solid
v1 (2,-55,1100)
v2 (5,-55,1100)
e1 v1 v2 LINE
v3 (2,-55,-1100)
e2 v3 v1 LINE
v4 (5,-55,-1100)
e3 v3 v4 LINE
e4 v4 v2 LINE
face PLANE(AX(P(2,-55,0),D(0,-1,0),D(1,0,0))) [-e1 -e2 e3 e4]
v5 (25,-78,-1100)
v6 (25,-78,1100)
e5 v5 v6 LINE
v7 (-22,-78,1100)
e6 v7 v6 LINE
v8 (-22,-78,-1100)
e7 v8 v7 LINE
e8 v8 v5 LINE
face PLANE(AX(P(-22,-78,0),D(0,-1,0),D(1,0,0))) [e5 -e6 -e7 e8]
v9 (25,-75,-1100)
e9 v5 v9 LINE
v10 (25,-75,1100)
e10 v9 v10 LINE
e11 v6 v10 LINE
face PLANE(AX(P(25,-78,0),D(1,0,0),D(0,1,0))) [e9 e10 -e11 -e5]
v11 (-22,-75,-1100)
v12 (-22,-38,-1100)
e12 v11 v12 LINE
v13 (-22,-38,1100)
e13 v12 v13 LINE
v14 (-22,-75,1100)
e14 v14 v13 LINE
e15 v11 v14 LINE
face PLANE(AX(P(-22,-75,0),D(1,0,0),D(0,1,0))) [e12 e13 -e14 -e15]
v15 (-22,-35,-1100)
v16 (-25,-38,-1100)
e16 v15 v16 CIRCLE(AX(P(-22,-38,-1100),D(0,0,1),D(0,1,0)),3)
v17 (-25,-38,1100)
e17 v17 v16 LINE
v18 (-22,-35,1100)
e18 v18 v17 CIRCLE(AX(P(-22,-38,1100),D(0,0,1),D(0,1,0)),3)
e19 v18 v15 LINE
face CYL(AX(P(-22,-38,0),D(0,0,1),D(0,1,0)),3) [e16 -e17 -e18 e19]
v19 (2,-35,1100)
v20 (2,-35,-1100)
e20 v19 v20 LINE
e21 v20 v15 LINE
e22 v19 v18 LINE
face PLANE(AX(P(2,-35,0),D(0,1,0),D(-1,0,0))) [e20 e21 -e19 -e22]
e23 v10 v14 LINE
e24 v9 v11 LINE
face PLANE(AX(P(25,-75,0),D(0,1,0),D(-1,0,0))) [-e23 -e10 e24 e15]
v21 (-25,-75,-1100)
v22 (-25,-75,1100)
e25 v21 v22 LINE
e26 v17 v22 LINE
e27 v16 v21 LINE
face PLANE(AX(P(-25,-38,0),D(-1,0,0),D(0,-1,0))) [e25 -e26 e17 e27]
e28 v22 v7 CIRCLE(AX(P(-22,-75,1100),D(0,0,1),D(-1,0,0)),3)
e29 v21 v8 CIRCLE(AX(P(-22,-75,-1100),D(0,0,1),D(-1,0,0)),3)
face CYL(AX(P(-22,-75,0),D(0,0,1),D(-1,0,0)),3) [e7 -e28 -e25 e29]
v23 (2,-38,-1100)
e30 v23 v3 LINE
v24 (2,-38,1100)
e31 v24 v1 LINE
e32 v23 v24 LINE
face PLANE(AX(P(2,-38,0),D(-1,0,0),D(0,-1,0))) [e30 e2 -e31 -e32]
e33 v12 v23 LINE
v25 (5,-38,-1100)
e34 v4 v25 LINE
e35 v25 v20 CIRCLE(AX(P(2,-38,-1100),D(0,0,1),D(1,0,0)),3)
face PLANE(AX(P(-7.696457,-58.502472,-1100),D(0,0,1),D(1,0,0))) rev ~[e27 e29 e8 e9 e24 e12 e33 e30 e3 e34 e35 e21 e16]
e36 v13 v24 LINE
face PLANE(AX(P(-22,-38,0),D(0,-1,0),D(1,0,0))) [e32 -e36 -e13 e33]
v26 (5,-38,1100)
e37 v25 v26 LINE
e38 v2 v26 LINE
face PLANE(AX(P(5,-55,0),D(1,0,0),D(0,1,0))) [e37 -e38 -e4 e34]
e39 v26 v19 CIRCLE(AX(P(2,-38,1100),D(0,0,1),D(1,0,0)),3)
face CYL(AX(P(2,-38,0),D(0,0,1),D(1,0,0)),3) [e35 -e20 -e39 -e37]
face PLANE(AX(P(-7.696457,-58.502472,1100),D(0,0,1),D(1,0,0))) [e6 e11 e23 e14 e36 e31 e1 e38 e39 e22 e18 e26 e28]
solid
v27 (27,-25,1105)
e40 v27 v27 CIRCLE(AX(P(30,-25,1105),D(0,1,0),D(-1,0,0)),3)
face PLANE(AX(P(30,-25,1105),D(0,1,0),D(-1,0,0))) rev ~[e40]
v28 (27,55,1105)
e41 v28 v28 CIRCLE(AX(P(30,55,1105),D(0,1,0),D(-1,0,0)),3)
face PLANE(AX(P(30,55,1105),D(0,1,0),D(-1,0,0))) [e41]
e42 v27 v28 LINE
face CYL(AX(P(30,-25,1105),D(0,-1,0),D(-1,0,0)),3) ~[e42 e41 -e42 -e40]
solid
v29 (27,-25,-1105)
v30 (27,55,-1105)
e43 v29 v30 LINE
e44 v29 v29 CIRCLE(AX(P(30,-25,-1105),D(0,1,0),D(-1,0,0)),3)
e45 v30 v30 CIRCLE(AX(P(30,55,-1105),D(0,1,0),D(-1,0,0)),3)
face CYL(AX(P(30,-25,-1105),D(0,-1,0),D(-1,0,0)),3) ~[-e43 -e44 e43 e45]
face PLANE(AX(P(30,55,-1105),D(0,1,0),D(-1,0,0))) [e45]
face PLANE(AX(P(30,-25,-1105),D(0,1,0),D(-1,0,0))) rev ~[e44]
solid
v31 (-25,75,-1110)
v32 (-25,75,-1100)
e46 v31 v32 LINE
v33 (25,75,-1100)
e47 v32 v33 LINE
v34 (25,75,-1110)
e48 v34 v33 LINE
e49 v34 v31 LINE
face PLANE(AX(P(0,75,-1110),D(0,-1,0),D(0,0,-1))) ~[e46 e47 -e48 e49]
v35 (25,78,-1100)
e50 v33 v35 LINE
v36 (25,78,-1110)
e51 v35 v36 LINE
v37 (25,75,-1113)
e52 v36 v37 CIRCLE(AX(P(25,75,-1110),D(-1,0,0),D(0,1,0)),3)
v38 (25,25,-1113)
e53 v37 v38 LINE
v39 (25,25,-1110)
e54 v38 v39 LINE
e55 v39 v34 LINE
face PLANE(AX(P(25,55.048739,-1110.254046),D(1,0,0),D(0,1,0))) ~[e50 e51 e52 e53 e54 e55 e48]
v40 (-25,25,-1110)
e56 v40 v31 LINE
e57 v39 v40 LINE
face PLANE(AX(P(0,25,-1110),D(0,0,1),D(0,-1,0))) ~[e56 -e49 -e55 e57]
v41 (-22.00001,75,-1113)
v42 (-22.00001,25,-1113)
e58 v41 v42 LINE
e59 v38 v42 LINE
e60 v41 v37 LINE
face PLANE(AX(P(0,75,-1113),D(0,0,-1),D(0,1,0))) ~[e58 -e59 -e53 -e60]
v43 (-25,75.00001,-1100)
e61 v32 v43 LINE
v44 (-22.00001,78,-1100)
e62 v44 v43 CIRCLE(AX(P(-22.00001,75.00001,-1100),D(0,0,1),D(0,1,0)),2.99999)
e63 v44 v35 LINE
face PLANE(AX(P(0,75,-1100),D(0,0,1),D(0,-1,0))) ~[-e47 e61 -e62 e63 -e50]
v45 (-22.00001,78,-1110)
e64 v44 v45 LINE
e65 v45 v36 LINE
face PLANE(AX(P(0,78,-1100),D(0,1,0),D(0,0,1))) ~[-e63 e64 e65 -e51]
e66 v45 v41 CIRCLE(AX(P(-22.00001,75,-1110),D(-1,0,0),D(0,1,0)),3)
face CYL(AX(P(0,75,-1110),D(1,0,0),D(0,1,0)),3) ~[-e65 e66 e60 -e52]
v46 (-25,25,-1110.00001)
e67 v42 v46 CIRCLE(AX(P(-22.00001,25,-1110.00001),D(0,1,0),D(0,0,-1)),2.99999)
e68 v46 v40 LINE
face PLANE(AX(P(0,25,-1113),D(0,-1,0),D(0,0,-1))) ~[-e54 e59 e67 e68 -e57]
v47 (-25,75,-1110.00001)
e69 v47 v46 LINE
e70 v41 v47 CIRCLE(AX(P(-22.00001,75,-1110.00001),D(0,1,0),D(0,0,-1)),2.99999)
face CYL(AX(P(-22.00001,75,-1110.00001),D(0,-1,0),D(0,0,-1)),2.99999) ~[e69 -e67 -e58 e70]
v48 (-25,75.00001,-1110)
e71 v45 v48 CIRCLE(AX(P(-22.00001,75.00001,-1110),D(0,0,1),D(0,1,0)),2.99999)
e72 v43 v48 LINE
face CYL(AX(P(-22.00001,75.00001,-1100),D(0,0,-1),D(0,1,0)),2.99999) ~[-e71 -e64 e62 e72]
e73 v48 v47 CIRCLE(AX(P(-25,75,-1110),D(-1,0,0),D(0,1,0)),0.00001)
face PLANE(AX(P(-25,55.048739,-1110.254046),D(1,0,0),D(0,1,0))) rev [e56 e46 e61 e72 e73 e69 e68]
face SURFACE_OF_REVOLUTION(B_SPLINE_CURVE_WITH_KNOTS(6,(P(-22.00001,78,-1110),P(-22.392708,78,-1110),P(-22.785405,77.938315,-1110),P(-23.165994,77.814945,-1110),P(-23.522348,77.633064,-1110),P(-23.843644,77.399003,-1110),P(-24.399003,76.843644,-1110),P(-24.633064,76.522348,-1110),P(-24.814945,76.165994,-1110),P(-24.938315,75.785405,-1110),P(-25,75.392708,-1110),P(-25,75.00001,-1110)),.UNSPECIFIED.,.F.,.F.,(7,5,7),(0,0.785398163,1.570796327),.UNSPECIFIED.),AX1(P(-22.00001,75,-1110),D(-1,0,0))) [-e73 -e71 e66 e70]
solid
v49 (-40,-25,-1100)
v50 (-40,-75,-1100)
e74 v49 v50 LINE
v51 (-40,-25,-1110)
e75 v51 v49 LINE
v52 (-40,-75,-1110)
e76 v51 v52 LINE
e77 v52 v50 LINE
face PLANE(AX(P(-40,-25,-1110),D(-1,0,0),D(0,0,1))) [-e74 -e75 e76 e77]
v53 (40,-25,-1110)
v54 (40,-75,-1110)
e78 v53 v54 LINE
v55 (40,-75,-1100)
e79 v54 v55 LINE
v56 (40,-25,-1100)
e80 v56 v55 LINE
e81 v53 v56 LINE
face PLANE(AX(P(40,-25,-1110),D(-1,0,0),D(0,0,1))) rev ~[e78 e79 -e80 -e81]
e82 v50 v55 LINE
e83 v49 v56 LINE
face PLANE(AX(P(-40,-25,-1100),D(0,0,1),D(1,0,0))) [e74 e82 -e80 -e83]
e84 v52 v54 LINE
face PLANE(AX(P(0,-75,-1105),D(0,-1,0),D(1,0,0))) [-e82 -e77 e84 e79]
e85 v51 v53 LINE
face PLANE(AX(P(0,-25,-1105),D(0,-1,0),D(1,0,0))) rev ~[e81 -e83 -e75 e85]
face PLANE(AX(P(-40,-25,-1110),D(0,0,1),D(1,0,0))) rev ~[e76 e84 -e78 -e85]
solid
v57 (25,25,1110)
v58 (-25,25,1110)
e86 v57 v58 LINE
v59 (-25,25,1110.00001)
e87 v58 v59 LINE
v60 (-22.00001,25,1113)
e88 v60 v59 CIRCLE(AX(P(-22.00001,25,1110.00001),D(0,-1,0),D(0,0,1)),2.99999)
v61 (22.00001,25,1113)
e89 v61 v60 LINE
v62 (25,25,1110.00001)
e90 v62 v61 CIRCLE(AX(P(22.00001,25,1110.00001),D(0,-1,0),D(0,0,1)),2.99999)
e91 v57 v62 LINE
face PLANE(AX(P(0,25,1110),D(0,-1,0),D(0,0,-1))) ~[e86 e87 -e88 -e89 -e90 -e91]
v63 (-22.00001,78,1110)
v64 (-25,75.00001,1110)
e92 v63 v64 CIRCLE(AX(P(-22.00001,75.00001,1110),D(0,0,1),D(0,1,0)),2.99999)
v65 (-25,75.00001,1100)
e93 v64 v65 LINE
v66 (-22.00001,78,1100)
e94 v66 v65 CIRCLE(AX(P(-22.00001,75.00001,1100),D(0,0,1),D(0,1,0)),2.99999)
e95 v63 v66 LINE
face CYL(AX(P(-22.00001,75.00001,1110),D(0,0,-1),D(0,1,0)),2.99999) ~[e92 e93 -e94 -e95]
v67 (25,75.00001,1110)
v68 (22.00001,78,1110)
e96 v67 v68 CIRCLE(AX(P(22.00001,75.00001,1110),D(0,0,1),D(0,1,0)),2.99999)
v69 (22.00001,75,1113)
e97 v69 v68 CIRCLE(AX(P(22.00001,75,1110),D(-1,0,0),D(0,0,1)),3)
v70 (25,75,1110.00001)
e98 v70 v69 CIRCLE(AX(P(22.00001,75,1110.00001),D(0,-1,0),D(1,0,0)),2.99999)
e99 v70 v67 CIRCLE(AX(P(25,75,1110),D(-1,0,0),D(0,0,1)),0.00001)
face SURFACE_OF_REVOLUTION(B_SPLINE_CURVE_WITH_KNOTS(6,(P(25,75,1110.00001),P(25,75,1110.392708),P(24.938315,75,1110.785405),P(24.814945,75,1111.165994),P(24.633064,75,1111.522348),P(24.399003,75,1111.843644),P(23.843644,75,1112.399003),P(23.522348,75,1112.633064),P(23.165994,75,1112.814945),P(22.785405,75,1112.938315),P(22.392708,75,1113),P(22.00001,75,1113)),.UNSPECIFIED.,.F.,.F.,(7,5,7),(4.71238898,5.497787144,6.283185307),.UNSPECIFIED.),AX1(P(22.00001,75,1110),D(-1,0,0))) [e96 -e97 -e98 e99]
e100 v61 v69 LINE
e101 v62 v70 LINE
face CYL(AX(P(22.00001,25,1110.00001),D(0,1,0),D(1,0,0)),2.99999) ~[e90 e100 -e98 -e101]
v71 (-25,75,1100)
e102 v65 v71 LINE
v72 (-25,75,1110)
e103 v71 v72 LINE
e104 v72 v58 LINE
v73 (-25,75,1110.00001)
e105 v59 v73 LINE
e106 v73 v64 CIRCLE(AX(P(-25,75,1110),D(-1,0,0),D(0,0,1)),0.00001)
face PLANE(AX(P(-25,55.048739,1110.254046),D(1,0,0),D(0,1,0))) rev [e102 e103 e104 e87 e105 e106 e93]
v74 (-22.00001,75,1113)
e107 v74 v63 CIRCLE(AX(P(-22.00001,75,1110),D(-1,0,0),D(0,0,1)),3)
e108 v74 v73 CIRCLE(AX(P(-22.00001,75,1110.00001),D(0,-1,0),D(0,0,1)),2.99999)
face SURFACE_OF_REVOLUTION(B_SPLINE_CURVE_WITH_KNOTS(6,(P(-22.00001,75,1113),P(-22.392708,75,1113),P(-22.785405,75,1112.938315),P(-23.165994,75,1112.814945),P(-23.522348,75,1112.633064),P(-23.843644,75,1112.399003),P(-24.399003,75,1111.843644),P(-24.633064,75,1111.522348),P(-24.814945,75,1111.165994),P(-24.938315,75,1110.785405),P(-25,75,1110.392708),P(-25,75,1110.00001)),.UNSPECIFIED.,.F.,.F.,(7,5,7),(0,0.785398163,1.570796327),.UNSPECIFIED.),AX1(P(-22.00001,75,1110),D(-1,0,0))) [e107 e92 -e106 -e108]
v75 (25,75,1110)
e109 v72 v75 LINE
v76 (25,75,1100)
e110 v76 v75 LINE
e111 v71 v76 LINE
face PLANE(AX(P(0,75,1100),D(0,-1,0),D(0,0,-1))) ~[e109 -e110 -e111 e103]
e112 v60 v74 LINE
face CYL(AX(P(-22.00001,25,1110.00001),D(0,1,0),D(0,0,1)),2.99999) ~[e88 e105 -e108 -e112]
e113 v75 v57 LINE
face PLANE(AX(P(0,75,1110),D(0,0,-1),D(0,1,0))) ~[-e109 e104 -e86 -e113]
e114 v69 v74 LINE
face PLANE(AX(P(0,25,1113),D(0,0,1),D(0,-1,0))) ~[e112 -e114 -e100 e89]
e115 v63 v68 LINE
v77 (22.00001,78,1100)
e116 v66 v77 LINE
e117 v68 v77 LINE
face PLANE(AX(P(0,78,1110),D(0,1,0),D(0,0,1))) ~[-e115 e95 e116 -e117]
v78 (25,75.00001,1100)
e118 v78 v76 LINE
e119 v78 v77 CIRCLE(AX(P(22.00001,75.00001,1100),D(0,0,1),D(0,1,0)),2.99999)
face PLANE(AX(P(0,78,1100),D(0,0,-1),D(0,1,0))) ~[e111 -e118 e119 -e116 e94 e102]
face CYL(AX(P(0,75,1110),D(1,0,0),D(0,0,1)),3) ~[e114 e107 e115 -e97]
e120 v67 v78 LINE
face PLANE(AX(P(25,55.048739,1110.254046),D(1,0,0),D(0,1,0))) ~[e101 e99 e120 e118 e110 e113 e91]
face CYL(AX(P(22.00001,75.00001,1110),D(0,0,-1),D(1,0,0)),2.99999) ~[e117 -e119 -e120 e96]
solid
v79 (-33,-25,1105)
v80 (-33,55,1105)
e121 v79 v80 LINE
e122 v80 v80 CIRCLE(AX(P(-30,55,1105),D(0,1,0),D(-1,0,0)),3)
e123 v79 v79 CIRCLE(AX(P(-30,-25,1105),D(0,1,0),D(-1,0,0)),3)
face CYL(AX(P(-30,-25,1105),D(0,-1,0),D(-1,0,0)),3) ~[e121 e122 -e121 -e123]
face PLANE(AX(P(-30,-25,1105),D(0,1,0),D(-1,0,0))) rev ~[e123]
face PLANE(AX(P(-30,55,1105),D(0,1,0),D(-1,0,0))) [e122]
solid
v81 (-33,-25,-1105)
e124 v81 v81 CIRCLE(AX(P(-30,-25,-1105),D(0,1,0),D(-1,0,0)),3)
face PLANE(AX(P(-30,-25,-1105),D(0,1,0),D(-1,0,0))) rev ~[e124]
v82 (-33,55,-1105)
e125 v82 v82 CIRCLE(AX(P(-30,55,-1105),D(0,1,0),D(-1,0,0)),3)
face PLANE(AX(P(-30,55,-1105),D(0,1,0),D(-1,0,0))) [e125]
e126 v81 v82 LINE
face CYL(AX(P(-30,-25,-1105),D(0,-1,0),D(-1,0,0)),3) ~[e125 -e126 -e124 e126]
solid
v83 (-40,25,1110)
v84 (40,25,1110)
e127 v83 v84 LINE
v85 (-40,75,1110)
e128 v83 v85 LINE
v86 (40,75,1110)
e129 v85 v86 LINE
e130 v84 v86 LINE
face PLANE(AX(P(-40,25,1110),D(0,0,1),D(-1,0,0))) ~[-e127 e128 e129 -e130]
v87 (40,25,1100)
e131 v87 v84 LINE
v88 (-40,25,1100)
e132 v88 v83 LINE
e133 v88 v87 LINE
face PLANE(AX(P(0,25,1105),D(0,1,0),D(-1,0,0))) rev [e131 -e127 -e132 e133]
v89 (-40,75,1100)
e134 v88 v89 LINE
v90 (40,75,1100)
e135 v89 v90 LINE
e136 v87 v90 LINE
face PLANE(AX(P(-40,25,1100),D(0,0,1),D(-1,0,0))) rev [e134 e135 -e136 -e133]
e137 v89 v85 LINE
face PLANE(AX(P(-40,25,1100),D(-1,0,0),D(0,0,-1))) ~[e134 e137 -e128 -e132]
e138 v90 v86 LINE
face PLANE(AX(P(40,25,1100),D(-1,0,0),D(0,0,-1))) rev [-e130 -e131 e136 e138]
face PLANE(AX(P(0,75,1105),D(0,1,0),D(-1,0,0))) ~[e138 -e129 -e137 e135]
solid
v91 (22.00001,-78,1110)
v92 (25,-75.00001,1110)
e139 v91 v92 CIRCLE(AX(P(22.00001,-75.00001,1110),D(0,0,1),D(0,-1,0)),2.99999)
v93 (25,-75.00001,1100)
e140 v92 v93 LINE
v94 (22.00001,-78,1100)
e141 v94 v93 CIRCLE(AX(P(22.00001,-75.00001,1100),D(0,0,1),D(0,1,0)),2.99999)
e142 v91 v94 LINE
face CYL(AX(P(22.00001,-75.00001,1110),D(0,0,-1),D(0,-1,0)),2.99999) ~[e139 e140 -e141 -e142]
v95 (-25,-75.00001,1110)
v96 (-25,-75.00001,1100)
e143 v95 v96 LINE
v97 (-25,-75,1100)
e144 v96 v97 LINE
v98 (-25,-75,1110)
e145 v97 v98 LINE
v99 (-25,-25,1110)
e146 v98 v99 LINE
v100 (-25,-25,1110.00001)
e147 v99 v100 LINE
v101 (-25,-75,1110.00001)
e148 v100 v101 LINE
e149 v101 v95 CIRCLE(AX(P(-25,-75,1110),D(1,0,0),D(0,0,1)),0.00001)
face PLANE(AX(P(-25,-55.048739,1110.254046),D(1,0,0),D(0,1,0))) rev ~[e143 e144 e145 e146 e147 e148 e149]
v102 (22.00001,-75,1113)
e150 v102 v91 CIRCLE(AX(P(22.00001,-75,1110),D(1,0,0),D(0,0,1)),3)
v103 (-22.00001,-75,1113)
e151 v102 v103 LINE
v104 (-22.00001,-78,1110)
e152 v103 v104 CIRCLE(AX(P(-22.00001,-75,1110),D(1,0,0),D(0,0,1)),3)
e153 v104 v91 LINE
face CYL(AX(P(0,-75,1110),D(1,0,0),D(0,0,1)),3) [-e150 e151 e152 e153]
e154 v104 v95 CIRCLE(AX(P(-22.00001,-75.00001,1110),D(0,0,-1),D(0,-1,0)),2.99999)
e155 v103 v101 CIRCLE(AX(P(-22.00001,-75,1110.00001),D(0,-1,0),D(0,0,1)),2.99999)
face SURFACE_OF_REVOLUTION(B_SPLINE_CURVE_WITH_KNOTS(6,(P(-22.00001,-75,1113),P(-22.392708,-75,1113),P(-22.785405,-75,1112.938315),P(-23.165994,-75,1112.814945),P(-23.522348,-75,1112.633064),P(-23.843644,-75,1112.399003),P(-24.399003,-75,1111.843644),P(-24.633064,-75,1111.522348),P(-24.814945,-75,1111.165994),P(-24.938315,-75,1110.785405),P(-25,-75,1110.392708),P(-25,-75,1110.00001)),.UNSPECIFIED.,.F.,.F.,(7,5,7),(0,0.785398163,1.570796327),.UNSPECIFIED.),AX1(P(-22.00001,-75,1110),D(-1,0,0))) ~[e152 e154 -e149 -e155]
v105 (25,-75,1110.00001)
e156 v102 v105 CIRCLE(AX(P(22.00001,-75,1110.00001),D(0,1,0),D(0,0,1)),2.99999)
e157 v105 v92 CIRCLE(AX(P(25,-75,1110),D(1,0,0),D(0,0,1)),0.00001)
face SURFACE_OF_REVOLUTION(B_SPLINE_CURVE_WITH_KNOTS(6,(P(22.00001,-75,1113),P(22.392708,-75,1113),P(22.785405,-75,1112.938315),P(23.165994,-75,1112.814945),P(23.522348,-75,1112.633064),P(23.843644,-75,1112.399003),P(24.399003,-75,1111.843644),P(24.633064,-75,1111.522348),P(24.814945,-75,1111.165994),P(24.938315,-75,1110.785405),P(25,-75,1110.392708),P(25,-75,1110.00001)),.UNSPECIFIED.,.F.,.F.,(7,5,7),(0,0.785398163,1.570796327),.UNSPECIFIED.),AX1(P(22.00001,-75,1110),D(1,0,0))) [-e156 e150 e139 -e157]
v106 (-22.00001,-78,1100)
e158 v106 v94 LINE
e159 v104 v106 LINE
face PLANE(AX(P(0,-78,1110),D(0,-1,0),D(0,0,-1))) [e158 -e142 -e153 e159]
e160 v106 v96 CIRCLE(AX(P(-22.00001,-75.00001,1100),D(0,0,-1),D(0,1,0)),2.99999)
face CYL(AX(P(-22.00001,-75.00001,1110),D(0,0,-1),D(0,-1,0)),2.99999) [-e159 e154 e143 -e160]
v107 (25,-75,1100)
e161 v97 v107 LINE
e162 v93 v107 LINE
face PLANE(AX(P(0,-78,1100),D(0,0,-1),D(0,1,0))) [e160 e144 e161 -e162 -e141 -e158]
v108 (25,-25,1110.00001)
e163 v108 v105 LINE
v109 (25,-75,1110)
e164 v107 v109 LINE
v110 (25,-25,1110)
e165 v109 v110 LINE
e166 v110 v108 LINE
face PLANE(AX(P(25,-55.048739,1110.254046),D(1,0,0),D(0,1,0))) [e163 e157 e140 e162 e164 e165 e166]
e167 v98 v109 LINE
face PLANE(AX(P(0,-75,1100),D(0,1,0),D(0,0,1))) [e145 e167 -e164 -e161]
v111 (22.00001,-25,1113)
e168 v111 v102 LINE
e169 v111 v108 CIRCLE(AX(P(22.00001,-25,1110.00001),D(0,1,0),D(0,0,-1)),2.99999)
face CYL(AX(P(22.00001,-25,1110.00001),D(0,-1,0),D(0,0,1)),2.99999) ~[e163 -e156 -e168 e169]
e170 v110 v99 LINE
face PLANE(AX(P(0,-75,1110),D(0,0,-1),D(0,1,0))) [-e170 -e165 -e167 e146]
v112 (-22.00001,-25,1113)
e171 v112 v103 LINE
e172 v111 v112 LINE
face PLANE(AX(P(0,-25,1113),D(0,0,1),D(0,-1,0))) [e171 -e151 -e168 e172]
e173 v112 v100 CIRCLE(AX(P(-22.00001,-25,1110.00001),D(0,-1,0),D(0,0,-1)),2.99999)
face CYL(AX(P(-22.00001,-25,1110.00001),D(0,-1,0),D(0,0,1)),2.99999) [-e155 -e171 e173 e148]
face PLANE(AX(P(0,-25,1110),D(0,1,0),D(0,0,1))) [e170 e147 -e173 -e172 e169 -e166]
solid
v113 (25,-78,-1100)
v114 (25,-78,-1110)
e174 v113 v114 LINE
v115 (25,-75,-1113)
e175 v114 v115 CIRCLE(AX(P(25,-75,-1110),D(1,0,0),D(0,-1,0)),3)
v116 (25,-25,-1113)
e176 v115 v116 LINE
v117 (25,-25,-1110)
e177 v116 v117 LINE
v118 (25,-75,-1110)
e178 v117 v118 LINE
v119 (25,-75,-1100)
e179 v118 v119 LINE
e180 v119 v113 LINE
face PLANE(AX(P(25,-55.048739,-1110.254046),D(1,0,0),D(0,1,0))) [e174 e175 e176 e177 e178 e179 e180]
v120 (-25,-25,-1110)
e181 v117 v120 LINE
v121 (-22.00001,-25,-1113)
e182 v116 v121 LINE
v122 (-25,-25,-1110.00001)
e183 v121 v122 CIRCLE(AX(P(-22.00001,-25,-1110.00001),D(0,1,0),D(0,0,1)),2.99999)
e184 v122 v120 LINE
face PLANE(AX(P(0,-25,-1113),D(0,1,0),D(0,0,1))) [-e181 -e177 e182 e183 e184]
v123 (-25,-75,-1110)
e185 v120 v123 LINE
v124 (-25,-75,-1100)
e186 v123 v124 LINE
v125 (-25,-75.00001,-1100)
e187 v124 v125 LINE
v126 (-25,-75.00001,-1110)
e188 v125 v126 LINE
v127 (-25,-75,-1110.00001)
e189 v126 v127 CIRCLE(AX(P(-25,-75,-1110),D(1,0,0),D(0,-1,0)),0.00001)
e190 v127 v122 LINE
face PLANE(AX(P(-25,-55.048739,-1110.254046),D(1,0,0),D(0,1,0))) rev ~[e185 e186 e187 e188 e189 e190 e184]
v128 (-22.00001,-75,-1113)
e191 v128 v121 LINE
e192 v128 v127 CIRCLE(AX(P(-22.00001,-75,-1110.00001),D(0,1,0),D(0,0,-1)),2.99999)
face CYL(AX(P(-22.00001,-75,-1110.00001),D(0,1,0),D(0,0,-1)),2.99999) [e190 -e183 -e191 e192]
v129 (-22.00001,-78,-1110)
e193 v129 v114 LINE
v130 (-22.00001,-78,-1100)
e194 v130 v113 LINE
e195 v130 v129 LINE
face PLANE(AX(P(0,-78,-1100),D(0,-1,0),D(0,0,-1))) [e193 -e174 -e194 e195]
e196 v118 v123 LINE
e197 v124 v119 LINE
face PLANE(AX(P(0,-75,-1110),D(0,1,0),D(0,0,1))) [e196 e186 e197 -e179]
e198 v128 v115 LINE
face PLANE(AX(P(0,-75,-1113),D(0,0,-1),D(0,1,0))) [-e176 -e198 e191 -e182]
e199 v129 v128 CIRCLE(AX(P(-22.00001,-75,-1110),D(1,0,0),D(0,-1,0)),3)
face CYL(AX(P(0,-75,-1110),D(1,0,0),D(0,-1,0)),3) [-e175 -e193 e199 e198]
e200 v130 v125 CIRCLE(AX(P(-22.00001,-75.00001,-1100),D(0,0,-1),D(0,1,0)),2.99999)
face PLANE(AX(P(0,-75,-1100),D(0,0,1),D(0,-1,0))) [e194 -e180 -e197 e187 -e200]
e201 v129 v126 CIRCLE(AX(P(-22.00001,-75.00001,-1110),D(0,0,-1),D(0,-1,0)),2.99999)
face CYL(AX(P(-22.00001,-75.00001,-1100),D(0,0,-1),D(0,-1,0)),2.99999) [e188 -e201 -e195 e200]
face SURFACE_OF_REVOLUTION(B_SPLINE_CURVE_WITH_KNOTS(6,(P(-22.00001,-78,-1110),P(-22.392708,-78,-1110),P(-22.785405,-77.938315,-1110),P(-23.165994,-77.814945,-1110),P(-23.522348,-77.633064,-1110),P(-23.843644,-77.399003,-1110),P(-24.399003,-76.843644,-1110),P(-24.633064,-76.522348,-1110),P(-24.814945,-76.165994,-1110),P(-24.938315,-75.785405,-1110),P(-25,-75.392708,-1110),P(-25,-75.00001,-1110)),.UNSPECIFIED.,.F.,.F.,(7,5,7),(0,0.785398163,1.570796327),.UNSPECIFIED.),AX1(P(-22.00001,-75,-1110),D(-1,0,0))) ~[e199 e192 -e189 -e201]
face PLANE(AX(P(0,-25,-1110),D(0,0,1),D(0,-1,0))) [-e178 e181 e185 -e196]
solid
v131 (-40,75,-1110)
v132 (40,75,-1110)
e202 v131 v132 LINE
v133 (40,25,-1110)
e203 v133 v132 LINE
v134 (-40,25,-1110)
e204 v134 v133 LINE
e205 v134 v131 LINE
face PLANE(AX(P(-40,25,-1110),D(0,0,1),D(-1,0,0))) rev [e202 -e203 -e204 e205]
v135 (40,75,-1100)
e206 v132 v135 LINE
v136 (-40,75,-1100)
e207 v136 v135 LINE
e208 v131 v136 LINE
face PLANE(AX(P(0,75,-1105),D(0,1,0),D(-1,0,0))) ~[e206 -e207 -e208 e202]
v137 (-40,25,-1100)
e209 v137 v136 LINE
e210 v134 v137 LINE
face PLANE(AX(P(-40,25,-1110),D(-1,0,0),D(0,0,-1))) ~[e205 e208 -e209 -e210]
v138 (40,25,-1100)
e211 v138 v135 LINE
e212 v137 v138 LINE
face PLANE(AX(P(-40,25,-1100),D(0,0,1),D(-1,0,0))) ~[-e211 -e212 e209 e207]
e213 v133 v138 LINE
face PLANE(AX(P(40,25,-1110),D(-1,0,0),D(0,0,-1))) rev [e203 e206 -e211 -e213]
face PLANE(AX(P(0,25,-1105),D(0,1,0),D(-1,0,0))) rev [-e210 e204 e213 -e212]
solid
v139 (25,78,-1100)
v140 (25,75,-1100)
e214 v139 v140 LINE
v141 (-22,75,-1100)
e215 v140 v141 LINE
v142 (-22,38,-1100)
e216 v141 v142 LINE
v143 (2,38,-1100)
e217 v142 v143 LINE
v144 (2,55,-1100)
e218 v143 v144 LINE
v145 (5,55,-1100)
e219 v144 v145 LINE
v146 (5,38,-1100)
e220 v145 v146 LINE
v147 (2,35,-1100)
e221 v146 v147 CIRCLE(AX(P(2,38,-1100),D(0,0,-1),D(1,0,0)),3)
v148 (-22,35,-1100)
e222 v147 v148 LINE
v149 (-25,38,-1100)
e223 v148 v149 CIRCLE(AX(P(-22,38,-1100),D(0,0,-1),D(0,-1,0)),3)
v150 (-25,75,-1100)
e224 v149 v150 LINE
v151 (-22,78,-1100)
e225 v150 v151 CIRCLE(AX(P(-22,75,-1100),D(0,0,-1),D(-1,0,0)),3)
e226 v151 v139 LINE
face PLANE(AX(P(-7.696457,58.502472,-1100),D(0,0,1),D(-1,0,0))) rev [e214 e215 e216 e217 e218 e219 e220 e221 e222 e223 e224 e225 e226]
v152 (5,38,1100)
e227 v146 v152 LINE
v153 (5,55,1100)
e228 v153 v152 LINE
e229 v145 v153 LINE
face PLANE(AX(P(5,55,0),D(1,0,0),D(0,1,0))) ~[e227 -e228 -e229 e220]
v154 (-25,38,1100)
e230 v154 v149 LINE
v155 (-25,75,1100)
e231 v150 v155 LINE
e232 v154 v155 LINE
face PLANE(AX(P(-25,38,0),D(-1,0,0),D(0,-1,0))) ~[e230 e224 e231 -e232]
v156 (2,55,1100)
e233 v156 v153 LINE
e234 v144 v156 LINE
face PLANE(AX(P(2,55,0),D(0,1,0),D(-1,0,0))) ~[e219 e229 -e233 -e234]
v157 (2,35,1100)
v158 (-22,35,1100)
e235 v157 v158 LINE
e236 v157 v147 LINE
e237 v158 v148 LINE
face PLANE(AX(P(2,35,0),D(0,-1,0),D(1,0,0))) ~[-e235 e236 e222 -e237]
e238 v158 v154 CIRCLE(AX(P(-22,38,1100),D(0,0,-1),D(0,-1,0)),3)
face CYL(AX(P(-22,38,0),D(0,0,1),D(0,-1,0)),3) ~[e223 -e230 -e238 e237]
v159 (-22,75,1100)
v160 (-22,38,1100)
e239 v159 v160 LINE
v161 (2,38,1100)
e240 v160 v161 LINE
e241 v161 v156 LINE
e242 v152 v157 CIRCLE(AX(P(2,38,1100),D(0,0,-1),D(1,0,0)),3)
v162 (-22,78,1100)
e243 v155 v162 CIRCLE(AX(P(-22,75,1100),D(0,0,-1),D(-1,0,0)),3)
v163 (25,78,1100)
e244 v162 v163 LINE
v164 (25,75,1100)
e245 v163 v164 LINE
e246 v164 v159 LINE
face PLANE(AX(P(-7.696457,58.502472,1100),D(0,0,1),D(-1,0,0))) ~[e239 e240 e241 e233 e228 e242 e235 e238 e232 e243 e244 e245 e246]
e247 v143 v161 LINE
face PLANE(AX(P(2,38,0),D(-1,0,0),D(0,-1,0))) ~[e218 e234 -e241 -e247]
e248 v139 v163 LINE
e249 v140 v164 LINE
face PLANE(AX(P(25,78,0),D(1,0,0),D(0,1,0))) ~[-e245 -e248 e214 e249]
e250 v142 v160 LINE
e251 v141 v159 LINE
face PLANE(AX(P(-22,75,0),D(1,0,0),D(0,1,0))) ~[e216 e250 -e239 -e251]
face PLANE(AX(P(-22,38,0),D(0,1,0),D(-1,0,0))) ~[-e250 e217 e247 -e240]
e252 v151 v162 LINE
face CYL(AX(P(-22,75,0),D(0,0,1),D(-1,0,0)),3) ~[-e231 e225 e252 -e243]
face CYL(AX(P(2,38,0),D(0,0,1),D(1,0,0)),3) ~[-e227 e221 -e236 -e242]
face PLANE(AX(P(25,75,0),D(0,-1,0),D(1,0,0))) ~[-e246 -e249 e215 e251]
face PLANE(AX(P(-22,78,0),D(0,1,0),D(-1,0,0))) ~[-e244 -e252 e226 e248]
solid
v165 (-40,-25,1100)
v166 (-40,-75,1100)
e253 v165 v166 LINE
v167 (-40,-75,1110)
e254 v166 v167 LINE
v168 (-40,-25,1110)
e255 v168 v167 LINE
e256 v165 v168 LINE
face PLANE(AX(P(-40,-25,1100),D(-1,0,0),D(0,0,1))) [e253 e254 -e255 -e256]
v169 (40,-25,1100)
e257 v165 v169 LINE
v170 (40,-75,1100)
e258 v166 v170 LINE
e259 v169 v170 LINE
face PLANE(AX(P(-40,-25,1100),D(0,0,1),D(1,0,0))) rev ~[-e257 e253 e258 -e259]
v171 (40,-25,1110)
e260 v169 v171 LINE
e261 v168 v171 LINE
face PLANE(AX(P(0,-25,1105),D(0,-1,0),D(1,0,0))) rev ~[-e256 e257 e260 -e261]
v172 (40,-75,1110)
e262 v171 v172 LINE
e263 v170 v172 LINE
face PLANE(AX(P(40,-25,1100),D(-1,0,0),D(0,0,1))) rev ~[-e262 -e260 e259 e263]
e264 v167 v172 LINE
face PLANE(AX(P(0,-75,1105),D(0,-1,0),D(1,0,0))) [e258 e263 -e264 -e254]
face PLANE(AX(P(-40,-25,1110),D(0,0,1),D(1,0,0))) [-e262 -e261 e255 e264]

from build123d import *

# Parameters (mm, degrees)
F1_W     = 80
F1_H     = 10
F2_DEPTH = 50
F4_R     = 3
F5_DEPTH = 80
F7_DEPTH = 1100
F9_DEPTH = 25
F11_R    = 2.99999
F11_2_R  = 2.99999
F11_3_R  = 2.99999
F11_4_R  = 2.99999


# Not quite as in the source:
# - a fillet or chamfer is up to 0.001 mm smaller than in the source, because OpenCascade refuses the exact size
# - a feature names something its author has since deleted; it is built from what else it names


with BuildPart() as f2:
    # F1 (on offset) → F2 (new body)
    with BuildSketch(Plane.XZ.offset(25)):
        with Locations((0, 1105)):
            Rectangle(F1_W, F1_H)
    extrude(amount=F2_DEPTH)


with BuildPart() as f2b:
    # F1 (on offset) → F2, piece 2 (new body)
    with BuildSketch(Plane.XZ.offset(25)):
        with Locations((0, -1105)):
            Rectangle(F1_W, F1_H)
    extrude(amount=F2_DEPTH)


with BuildPart() as f5:
    # F4 (on face) → F5 (new body)
    with BuildSketch(Plane(origin=(0, -25, 0), x_dir=(-1, 0, 0), z_dir=(0, 1, 0))):
        with Locations((-30, 1105)):
            Circle(F4_R)
    extrude(amount=F5_DEPTH)


with BuildPart() as f5b:
    # F4 (on face) → F5, piece 2 (new body)
    with BuildSketch(Plane(origin=(0, -25, 0), x_dir=(-1, 0, 0), z_dir=(0, 1, 0))):
        with Locations((30, 1105)):
            Circle(F4_R)
    extrude(amount=F5_DEPTH)


with BuildPart() as f5c:
    # F4 (on face) → F5, piece 3 (new body)
    with BuildSketch(Plane(origin=(0, -25, 0), x_dir=(-1, 0, 0), z_dir=(0, 1, 0))):
        with Locations((-30, -1105)):
            Circle(F4_R)
    extrude(amount=F5_DEPTH)


with BuildPart() as f5d:
    # F4 (on face) → F5, piece 4 (new body)
    with BuildSketch(Plane(origin=(0, -25, 0), x_dir=(-1, 0, 0), z_dir=(0, 1, 0))):
        with Locations((30, -1105)):
            Circle(F4_R)
    extrude(amount=F5_DEPTH)


with BuildPart() as f7:
    # F6 (on Top) → F7 (new body, symmetric)
    with BuildSketch(Plane.XY):
        with BuildLine():
            Line((-25, -38), (-25, -75))
            ThreePointArc((-25, -75), (-24.1213203436, -77.1213203436), (-22, -78))
            Line((-22, -78), (25, -78))
            Line((25, -78), (25, -75))
            Line((25, -75), (-22, -75))
            Line((-22, -75), (-22, -38))
            Line((-22, -38), (2, -38))
            Line((2, -38), (2, -55))
            Line((2, -55), (5, -55))
            Line((5, -55), (5, -38))
            ThreePointArc((5, -38), (4.1213203436, -35.8786796564), (2, -35))
            Line((2, -35), (-22, -35))
            ThreePointArc((-22, -35), (-24.1213203436, -35.8786796564), (-25, -38))
        make_face()
    extrude(amount=F7_DEPTH, both=True)


with BuildPart() as f9:
    # F8 (on Right) → F9 (new body, symmetric)
    with BuildSketch(Plane.YZ):
        with BuildLine():
            Line((-75, -1110), (-75, -1100))
            Line((-75, -1100), (-78, -1100))
            Line((-78, -1100), (-78, -1110))
            ThreePointArc((-78, -1110), (-77.1213203436, -1112.1213203436), (-75, -1113))
            Line((-75, -1113), (-25, -1113))
            Line((-25, -1113), (-25, -1110))
            Line((-25, -1110), (-75, -1110))
        make_face()
    extrude(amount=F9_DEPTH, both=True)


with BuildPart() as f9b:
    # F8 (on Right) → F9, piece 2 (new body, symmetric)
    with BuildSketch(Plane.YZ):
        with BuildLine():
            ThreePointArc((-75, 1113), (-77.1213203436, 1112.1213203436), (-78, 1110))
            Line((-78, 1110), (-78, 1100))
            Line((-78, 1100), (-75, 1100))
            Line((-75, 1100), (-75, 1110))
            Line((-75, 1110), (-25, 1110))
            Line((-25, 1110), (-25, 1113))
            Line((-25, 1113), (-75, 1113))
        make_face()
    extrude(amount=F9_DEPTH, both=True)


with BuildPart() as f10_1:
    # F10: instance of F2
    add(f2.part.mirror(Plane.XZ))


with BuildPart() as f10_2:
    # F10: instance of F2b
    add(f2b.part.mirror(Plane.XZ))


with BuildPart() as f10_3:
    # F10: instance of F7
    add(f7.part.mirror(Plane.XZ))


with BuildPart() as f10_4:
    # F10: instance of F9b
    add(f9b.part.mirror(Plane.XZ))

    # F11#3 (radius 3 in the source; OpenCascade refuses exactly that, so slightly less here)
    f11_3_edges = [f10_4.edges().sort_by_distance(p)[0] for p in [
        (-25, 78, 1105),
        (25, 78, 1105),
        (-25, 77.12132, 1112.12132),
        (25, 77.12132, 1112.12132),
        (-25, 50, 1113),
        (25, 50, 1113),
    ]]
    fillet(f11_3_edges, radius=F11_3_R)


with BuildPart() as f10_5:
    # F10: instance of F9
    add(f9.part.mirror(Plane.XZ))

    # F11#4 (radius 3 in the source; OpenCascade refuses exactly that, so slightly less here)
    f11_4_edges = [f10_5.edges().sort_by_distance(p)[0] for p in [
        (-25, 50, -1113),
        (-25, 77.12132, -1112.12132),
        (-25, 78, -1105),
    ]]
    fillet(f11_4_edges, radius=F11_4_R)


with BuildPart() as f9_1:
    add(f9.part)

    # F11 (radius 3 in the source; OpenCascade refuses exactly that, so slightly less here)
    f11_edges = [f9_1.edges().sort_by_distance(p)[0] for p in [
        (-25, -78, -1105),
        (-25, -50, -1113),
        (-25, -77.12132, -1112.12132),
    ]]
    fillet(f11_edges, radius=F11_R)


with BuildPart() as f9b_1:
    add(f9b.part)

    # F11#2 (radius 3 in the source; OpenCascade refuses exactly that, so slightly less here)
    f11_2_edges = [f9b_1.edges().sort_by_distance(p)[0] for p in [
        (25, -50, 1113),
        (-25, -50, 1113),
        (-25, -78, 1105),
        (25, -78, 1105),
        (-25, -77.12132, 1112.12132),
        (25, -77.12132, 1112.12132),
    ]]
    fillet(f11_2_edges, radius=F11_2_R)


solid = Compound([f2.part, f2b.part, f5.part, f5b.part, f5c.part, f5d.part, f7.part, f10_1.part, f10_2.part, f10_3.part, f10_4.part, f10_5.part, f9_1.part, f9b_1.part])
